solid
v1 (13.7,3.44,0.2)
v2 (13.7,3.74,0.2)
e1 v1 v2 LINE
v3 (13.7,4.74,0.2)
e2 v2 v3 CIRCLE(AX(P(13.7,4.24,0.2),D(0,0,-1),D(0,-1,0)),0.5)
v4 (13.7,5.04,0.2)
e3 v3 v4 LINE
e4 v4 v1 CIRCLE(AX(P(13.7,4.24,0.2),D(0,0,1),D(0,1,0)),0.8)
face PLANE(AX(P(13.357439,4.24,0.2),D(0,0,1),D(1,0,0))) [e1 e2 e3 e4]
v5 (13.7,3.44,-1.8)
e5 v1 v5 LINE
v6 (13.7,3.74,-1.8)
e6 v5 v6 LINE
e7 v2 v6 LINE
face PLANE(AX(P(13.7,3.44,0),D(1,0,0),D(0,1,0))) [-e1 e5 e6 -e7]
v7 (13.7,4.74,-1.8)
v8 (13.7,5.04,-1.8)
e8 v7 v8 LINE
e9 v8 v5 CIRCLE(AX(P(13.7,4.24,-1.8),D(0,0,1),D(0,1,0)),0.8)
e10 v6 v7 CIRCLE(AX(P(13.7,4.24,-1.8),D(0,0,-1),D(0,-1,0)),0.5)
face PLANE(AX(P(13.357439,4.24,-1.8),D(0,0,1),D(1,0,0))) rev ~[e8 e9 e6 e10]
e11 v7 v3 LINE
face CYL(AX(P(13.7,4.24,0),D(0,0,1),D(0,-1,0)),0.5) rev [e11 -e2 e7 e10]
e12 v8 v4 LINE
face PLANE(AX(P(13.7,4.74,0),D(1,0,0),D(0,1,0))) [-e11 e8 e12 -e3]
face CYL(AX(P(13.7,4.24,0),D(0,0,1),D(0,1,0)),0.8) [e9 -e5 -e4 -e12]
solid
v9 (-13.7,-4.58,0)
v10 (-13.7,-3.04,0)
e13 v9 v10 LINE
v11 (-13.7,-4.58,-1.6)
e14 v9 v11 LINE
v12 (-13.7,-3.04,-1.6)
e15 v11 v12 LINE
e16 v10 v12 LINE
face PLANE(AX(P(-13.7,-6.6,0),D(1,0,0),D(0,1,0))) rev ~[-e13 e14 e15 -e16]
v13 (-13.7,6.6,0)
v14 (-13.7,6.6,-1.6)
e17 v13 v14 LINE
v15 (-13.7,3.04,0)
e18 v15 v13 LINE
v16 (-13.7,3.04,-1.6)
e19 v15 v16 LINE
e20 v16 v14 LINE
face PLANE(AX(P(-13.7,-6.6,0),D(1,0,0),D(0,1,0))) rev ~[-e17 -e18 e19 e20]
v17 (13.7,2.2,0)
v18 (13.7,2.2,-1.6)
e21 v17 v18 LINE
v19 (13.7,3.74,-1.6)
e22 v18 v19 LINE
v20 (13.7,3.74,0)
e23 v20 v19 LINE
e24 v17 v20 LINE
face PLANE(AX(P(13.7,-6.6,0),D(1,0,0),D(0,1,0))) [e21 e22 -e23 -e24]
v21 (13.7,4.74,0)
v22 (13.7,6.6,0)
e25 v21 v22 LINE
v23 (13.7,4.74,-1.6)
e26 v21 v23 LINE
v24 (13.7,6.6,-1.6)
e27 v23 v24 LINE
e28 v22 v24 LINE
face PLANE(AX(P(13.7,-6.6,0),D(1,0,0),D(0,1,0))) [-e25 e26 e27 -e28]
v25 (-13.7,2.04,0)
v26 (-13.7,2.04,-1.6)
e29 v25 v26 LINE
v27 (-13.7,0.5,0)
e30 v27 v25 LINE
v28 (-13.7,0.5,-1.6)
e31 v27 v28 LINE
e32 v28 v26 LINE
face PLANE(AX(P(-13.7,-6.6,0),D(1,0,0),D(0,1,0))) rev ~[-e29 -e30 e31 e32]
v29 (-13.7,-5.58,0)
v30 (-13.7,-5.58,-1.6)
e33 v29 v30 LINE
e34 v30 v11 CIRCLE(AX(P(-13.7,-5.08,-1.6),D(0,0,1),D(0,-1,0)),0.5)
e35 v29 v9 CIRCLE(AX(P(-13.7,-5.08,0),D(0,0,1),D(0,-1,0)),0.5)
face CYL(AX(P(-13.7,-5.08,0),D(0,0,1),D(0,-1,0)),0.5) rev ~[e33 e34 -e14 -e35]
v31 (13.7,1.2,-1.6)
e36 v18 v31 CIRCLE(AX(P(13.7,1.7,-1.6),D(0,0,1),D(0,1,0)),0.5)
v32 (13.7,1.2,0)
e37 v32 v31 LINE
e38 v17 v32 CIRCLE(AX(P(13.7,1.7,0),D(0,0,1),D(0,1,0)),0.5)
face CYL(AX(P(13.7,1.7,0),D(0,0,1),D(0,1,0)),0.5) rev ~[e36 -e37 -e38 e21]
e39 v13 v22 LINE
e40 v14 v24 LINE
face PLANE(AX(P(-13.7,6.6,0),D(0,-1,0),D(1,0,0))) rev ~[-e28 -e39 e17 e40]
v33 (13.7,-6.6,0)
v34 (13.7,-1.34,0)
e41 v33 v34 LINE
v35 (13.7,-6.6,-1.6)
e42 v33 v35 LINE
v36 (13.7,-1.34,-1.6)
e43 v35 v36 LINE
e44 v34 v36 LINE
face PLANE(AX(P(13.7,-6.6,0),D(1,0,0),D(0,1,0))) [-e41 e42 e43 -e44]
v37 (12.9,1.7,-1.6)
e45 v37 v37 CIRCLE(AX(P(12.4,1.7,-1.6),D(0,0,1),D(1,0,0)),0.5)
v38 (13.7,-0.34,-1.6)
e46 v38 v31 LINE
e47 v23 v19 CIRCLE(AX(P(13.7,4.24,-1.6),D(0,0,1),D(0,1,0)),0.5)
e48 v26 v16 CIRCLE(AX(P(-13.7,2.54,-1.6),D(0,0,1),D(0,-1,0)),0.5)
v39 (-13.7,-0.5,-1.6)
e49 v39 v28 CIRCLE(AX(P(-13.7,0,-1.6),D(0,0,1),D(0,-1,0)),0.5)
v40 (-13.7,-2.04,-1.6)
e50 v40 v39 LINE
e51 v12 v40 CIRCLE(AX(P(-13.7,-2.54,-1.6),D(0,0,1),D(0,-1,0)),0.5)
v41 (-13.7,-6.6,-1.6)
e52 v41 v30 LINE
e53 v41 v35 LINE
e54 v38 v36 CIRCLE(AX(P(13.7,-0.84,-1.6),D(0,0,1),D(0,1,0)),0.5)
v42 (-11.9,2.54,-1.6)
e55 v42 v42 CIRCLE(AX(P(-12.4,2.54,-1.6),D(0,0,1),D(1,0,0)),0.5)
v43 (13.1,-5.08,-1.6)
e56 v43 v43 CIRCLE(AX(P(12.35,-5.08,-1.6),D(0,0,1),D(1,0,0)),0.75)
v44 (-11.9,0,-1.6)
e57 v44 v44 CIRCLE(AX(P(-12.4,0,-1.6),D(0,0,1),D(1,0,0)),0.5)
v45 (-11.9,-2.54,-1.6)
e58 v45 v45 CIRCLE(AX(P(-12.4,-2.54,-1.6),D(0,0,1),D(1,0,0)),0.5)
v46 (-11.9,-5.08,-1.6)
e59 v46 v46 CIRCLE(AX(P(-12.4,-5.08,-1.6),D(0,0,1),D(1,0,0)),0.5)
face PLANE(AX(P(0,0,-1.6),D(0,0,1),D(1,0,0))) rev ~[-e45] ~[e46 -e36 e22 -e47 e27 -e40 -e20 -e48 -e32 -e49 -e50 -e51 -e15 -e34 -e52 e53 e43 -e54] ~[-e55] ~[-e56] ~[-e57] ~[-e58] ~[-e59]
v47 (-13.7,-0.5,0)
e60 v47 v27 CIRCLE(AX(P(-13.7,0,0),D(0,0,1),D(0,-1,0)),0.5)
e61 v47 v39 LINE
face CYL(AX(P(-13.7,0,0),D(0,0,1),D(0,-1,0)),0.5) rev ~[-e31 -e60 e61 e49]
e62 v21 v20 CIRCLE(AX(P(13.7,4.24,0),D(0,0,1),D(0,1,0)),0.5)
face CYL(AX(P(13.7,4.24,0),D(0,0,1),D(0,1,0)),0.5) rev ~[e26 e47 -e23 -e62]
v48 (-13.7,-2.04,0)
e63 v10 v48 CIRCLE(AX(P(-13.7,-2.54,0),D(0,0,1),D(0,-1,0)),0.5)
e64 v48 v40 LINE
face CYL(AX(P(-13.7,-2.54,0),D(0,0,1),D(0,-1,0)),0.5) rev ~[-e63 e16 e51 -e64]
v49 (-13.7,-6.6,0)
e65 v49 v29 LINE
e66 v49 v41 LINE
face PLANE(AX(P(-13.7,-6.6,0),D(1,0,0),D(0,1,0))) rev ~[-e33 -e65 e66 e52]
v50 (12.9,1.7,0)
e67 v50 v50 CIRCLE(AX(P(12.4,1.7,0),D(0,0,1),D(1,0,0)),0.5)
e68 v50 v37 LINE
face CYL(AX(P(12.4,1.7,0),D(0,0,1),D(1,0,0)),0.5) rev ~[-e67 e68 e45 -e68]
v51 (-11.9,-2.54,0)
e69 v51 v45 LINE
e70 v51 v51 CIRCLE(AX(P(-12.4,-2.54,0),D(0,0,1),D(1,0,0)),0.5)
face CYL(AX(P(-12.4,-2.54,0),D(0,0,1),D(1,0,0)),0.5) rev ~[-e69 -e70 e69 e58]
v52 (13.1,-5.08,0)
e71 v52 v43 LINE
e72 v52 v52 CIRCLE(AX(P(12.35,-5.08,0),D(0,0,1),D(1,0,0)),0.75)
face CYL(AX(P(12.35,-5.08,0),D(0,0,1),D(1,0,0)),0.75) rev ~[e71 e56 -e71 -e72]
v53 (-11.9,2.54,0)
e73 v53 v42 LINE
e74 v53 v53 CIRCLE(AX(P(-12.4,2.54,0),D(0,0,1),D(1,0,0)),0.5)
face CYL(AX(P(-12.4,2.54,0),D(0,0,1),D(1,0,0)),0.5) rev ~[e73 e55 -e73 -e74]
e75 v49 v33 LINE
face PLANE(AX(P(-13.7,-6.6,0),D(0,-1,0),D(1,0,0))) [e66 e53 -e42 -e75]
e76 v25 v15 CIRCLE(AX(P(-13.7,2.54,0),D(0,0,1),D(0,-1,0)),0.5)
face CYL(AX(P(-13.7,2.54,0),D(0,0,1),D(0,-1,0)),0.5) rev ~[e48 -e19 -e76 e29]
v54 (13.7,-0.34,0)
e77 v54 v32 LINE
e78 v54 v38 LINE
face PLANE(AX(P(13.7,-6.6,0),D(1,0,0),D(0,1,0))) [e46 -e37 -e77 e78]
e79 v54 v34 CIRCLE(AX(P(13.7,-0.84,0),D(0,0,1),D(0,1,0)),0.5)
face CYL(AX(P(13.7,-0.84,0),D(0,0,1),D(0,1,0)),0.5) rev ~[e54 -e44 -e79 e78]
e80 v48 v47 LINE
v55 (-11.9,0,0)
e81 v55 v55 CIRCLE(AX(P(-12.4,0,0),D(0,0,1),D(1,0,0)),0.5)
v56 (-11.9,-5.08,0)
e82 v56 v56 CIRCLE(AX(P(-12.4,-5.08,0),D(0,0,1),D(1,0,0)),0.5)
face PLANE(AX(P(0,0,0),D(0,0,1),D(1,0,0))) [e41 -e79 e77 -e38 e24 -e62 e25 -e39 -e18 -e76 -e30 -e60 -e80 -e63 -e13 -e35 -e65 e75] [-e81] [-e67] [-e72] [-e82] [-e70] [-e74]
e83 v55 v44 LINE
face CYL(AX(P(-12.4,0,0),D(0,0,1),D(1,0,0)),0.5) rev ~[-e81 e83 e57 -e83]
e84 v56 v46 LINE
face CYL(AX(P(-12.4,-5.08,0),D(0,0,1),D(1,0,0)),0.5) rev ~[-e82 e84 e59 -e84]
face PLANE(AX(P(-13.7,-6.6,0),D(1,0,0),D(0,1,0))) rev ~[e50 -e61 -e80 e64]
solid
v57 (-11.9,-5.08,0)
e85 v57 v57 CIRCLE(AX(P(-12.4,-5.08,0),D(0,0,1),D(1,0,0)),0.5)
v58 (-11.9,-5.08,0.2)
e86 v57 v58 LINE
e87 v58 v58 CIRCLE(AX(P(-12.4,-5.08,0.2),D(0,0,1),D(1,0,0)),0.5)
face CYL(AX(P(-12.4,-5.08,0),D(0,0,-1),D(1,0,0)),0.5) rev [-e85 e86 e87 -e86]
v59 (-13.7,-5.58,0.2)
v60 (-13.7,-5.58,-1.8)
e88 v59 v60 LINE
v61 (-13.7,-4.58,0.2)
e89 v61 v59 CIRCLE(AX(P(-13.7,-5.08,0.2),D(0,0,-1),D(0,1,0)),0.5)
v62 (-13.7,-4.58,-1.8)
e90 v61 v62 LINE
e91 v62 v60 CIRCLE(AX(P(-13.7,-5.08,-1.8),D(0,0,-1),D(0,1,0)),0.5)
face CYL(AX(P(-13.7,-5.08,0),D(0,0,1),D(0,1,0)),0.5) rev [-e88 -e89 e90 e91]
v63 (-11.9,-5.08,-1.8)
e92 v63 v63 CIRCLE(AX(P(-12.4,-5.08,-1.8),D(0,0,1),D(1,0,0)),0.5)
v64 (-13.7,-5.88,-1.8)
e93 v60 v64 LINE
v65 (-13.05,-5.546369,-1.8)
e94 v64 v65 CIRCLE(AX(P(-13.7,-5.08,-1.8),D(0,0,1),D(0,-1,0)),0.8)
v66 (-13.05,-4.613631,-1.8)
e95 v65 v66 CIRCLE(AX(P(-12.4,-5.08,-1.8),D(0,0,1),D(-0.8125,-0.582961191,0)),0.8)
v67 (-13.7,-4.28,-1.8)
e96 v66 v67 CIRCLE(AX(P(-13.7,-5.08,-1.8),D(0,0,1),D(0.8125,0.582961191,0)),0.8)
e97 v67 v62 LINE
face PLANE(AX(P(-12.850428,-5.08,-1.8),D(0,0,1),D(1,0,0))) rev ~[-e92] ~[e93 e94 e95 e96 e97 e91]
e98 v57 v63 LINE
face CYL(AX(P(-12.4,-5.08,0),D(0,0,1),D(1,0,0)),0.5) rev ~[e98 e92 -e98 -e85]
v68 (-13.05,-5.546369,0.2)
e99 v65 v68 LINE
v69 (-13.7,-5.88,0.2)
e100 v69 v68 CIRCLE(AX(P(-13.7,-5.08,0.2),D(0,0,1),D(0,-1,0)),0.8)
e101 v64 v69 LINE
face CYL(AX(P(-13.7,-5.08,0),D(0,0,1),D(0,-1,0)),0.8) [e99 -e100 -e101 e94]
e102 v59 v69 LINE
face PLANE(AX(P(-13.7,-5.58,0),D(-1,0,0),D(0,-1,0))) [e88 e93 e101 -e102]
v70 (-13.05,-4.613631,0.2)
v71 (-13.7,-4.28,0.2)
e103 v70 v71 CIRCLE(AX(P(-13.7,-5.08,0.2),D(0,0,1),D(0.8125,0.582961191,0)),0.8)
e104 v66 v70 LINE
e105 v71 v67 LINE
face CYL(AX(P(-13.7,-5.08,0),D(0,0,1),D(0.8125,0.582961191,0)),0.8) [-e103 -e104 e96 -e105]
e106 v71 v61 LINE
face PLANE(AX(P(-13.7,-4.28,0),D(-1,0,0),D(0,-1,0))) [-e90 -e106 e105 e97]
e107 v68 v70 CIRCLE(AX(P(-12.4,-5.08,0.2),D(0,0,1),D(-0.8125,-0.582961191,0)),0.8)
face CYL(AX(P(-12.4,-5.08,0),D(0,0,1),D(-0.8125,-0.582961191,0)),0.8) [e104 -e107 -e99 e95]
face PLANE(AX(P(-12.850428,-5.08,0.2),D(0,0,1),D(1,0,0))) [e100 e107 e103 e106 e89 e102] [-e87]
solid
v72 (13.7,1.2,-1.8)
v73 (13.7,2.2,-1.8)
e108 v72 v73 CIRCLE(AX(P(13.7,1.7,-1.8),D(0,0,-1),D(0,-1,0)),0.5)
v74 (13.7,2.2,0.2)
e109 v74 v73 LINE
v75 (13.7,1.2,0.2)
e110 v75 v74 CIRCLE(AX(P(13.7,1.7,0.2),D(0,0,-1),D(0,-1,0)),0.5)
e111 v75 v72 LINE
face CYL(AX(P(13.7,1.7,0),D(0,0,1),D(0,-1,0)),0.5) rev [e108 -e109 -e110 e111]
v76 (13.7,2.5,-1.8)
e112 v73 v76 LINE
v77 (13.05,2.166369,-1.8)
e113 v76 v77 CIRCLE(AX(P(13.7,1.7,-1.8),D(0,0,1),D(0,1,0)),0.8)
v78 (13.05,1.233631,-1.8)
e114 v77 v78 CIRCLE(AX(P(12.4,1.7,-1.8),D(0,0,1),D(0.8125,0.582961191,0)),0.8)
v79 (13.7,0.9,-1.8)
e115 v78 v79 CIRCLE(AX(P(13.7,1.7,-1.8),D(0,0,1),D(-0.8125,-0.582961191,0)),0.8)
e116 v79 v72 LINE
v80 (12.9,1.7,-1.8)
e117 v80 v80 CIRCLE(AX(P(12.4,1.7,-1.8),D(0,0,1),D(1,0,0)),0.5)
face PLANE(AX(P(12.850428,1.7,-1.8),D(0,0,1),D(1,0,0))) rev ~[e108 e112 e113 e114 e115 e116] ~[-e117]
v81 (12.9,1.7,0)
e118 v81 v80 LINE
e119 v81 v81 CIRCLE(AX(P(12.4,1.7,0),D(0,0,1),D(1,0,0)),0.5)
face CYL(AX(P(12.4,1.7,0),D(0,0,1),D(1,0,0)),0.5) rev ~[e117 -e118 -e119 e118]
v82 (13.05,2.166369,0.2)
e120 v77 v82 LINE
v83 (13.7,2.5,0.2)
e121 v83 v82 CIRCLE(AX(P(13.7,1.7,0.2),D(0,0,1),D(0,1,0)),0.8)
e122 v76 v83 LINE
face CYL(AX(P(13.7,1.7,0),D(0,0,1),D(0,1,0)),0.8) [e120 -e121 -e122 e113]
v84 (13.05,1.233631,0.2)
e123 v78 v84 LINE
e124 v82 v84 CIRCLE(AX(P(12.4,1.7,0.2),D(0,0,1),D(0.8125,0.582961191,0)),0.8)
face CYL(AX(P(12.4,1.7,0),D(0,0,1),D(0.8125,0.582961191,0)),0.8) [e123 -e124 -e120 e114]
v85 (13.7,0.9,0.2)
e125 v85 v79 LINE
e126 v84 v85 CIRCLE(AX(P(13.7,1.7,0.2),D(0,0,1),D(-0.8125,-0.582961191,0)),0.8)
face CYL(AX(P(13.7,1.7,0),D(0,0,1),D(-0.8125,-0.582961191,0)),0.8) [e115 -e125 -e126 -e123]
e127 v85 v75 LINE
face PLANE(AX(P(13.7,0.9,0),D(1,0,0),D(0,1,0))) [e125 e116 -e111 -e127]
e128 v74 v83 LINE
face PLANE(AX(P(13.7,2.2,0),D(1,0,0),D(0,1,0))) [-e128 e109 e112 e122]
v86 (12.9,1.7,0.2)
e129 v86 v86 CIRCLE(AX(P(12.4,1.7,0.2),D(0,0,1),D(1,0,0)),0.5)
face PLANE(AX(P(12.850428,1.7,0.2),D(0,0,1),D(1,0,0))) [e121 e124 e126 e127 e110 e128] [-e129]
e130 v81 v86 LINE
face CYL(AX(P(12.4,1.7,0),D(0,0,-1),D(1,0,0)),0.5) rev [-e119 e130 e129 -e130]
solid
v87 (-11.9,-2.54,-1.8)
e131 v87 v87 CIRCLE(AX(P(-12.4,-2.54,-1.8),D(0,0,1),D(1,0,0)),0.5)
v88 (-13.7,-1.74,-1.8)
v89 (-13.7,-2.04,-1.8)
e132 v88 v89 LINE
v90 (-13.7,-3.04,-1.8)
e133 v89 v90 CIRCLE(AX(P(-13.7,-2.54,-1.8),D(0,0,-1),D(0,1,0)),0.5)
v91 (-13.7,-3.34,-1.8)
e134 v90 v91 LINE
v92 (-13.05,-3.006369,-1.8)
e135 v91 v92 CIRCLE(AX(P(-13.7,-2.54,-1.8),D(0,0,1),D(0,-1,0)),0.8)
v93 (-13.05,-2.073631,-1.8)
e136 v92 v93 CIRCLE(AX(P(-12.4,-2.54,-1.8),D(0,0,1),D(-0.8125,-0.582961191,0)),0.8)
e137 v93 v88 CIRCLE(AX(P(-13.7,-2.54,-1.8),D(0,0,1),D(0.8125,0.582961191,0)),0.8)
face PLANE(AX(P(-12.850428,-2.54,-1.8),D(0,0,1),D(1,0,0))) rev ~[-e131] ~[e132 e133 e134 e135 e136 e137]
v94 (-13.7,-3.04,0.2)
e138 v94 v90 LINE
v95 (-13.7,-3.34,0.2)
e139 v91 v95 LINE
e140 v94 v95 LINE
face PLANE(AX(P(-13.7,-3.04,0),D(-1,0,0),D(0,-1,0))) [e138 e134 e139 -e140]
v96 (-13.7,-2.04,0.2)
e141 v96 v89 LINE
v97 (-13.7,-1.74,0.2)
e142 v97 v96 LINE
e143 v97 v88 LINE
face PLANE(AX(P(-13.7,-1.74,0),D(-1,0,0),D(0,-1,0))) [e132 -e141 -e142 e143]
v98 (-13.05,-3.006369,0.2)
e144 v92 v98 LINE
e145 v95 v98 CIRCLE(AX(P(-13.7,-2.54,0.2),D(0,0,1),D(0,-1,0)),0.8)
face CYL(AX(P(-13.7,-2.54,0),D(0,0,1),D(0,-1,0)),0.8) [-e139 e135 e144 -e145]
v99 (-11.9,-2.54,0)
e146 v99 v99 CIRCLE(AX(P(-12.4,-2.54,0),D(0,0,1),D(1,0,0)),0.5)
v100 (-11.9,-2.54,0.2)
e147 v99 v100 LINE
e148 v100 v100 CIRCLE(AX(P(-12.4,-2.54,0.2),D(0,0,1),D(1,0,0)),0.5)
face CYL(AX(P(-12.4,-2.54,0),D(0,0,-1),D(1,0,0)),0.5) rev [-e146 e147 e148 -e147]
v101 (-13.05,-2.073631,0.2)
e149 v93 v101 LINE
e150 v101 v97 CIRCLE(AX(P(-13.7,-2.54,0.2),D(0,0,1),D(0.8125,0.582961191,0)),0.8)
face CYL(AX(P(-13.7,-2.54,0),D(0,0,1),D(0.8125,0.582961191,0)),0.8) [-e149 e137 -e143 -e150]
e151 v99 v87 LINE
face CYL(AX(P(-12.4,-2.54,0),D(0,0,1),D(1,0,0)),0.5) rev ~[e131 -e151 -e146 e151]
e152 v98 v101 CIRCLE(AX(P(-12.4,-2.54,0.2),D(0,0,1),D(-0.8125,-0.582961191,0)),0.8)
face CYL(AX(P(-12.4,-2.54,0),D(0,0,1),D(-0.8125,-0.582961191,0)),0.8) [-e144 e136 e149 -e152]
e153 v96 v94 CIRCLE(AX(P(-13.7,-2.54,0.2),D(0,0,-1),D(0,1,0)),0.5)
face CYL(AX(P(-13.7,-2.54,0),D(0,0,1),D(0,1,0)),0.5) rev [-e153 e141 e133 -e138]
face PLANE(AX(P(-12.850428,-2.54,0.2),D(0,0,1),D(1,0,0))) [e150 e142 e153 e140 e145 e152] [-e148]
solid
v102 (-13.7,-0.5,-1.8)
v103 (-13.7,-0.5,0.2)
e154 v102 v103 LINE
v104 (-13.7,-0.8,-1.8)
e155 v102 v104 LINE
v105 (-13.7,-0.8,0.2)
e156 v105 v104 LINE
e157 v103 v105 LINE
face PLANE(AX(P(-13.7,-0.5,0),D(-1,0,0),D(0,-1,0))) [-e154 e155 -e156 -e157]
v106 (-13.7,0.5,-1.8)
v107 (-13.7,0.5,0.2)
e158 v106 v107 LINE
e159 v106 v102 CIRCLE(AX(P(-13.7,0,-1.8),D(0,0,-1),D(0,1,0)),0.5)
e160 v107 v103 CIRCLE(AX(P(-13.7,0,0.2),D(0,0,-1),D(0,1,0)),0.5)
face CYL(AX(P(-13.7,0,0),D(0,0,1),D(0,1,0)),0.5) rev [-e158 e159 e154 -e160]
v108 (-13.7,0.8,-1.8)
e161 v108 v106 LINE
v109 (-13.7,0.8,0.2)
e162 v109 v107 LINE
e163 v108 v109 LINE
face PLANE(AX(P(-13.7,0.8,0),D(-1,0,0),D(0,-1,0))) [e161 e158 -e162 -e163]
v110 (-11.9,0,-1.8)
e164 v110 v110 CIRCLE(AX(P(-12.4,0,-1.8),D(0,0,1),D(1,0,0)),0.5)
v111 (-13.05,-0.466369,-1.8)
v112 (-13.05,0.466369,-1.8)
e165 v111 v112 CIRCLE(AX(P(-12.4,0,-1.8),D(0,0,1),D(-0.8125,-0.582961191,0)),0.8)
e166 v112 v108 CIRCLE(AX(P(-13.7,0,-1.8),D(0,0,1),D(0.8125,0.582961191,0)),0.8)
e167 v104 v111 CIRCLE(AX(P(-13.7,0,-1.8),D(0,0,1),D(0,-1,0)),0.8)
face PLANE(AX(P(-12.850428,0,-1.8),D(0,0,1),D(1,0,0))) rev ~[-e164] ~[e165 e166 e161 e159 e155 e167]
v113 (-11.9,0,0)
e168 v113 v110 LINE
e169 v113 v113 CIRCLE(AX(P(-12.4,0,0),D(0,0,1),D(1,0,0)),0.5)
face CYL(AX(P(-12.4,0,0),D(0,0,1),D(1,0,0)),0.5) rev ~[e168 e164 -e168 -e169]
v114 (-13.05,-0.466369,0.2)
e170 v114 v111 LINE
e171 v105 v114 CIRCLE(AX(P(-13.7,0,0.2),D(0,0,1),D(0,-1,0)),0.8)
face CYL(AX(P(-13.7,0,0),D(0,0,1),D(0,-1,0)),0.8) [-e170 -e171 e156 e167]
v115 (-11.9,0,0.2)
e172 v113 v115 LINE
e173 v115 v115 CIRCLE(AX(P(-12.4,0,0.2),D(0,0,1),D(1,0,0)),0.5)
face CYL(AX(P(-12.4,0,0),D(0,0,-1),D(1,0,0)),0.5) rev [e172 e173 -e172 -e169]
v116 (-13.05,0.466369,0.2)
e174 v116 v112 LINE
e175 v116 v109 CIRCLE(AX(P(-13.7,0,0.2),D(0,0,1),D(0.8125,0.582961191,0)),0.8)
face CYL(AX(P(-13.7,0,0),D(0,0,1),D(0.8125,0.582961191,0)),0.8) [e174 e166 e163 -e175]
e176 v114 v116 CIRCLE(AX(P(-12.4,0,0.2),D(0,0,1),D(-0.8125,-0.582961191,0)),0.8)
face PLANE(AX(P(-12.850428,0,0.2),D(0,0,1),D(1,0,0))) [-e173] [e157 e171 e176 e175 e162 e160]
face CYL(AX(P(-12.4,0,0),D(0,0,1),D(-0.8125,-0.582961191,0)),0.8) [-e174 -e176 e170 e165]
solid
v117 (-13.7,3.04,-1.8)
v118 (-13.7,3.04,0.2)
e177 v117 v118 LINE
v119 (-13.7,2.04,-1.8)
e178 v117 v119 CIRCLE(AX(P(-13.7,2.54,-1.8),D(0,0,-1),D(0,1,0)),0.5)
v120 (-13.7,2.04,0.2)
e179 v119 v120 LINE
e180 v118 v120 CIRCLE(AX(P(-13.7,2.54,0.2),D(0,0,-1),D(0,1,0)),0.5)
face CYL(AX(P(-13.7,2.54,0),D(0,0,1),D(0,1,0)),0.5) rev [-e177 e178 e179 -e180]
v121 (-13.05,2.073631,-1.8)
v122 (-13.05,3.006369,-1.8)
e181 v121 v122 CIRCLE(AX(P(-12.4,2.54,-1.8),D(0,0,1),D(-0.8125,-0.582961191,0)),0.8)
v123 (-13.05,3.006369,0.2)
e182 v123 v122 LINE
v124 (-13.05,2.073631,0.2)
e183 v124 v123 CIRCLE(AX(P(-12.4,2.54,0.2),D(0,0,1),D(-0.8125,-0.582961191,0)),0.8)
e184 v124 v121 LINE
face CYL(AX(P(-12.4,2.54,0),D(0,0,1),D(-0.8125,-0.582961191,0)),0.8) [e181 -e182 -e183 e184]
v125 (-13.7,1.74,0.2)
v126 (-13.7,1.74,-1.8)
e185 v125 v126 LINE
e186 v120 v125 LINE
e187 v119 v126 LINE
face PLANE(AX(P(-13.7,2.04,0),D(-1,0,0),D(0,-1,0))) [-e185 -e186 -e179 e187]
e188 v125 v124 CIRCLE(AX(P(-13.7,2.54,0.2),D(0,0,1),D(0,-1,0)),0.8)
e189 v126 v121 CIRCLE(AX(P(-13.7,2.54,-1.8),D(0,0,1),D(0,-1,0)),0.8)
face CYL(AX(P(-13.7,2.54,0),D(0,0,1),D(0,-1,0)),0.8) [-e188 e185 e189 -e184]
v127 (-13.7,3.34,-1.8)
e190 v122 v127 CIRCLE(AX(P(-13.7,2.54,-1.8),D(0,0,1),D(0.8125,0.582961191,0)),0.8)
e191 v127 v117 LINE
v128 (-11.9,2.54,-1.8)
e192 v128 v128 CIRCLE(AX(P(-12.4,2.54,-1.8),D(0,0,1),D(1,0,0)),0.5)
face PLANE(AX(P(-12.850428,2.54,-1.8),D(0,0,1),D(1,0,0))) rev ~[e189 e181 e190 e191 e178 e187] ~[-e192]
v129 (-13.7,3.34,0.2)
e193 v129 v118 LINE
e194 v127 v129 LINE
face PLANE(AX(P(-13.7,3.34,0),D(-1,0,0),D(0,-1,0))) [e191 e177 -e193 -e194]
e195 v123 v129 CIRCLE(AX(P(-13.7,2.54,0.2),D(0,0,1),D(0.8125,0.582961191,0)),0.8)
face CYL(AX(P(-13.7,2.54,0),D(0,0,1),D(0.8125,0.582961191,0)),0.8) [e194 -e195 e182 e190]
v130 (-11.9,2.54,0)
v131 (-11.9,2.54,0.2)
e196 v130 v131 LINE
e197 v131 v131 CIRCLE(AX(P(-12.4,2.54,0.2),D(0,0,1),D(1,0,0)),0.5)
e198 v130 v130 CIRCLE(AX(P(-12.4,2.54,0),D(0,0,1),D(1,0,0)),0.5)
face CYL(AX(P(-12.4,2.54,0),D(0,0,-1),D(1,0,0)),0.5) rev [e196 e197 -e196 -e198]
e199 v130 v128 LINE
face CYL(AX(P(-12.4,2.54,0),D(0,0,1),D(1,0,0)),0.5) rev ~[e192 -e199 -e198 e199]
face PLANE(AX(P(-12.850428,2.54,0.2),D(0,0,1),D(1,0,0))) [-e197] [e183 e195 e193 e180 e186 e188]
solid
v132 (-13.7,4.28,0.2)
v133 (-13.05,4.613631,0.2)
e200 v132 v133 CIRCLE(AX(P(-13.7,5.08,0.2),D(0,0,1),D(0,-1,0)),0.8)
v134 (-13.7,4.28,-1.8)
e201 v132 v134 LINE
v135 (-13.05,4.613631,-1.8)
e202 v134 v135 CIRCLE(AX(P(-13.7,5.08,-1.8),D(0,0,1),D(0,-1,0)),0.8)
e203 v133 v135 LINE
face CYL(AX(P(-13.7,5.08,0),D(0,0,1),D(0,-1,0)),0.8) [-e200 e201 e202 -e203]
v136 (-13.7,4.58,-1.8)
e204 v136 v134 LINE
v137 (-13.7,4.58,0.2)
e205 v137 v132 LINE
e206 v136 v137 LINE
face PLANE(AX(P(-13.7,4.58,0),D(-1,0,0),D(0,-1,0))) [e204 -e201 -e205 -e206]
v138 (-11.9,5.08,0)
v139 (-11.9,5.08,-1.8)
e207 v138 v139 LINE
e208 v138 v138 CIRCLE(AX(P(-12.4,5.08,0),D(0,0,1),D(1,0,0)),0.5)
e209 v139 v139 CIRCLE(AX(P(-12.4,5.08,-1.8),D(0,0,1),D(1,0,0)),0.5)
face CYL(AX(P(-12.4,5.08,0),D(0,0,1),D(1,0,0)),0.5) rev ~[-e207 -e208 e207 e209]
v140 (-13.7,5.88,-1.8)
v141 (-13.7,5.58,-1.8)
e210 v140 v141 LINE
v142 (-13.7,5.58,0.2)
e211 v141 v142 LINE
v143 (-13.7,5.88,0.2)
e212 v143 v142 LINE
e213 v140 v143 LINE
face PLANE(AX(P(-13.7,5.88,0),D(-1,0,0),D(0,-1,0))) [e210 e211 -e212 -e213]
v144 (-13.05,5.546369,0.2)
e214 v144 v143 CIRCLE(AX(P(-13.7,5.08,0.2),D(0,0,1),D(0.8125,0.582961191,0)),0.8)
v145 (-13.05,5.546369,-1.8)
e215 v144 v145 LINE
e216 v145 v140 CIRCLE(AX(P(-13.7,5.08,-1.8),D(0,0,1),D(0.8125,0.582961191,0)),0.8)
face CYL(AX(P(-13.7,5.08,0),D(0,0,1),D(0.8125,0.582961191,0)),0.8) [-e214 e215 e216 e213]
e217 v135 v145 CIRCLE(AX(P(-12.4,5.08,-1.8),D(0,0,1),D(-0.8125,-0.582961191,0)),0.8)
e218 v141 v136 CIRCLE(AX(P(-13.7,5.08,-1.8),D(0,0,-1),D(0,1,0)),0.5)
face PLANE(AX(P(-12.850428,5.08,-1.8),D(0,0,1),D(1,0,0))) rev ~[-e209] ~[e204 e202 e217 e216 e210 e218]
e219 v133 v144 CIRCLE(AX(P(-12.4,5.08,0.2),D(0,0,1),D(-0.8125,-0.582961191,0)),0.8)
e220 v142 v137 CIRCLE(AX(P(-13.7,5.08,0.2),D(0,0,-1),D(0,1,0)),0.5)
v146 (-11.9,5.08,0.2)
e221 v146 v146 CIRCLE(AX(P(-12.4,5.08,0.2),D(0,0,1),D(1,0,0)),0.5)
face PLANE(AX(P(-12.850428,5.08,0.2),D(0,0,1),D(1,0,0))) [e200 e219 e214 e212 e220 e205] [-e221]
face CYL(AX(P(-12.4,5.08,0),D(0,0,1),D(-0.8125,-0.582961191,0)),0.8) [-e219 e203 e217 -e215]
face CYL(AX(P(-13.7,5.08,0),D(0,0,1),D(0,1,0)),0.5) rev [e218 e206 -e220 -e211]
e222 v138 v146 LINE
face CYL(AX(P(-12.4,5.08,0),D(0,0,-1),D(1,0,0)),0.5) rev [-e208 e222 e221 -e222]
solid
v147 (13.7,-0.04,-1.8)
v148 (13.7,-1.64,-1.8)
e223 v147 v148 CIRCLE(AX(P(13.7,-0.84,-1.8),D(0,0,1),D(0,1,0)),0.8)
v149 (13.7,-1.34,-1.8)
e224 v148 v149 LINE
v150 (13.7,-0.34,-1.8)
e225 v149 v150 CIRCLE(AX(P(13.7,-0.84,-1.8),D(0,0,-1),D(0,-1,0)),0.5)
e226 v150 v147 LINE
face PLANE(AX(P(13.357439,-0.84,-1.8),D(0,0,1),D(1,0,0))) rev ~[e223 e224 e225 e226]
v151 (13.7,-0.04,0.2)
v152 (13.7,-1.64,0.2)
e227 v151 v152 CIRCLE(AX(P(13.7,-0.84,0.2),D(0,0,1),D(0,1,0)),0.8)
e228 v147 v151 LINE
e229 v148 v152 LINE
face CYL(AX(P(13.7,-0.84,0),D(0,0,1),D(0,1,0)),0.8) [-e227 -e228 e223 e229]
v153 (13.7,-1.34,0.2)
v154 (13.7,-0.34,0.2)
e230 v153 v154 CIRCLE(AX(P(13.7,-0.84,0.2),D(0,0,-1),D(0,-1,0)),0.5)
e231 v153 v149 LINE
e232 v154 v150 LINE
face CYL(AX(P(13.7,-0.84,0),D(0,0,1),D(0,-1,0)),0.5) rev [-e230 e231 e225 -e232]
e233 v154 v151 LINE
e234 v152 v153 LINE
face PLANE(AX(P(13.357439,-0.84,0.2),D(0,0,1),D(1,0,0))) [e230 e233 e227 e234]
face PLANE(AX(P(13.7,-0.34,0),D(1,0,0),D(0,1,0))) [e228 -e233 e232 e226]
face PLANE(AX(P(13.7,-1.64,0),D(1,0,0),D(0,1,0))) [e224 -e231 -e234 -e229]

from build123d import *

# Parameters (mm, degrees)
F0_W          = 27.4
F0_H          = 13.2
F0_R          = 0.75
F1_DEPTH      = 1.6
F2_DEPTH      = 1.601
F4_DEPTH      = 0.2
F4_DEPTH_BACK = 1.8
F3_R          = 0.5
F5_DEPTH      = 1.801


# Not quite as in the source:
# - a feature names something its author has since deleted; it is built from what else it names


with BuildPart() as f1:
    # F0 (on Top) → F1 (new body)
    with BuildSketch(Plane.XY):
        Rectangle(F0_W, F0_H)
        with Locations((12.35, -5.08)):
            Circle(F0_R, mode=Mode.SUBTRACT)
        with Locations((12.35, -5.08)):
            Circle(F0_R)
    extrude(amount=-F1_DEPTH)

    # F0 (on Top) → F2 (cut, through all)
    with BuildSketch(Plane.XY):
        with Locations((12.35, -5.08)):
            Circle(F0_R)
    extrude(amount=-F2_DEPTH, mode=Mode.SUBTRACT)

    # F3 (on face) → F5 (cut, through all)
    with BuildSketch(Plane.XY):
        with Locations((-12.4, 2.54)):
            Circle(F3_R)
        with BuildLine():
            ThreePointArc((-13.7, 2.04), (-13.2, 2.54), (-13.7, 3.04))
            Line((-13.7, 3.04), (-13.7, 2.04))
        make_face()
        with Locations((-12.4, 0)):
            Circle(F3_R)
        with BuildLine():
            ThreePointArc((-13.7, -0.5), (-13.2, 0), (-13.7, 0.5))
            Line((-13.7, 0.5), (-13.7, -0.5))
        make_face()
        with Locations((-12.4, -2.54)):
            Circle(F3_R)
        with BuildLine():
            Line((-13.7, -2.04), (-13.7, -3.04))
            ThreePointArc((-13.7, -3.04), (-13.2, -2.54), (-13.7, -2.04))
        make_face()
        with Locations((-12.4, -5.08)):
            Circle(F3_R)
        with BuildLine():
            Line((-13.7, -4.58), (-13.7, -5.58))
            ThreePointArc((-13.7, -5.58), (-13.2, -5.08), (-13.7, -4.58))
        make_face()
        with BuildLine():
            Line((13.7, -1.34), (13.7, -0.34))
            ThreePointArc((13.7, -0.34), (13.2, -0.84), (13.7, -1.34))
        make_face()
        with BuildLine():
            Line((13.7, 3.74), (13.7, 4.74))
            ThreePointArc((13.7, 4.74), (13.2, 4.24), (13.7, 3.74))
        make_face()
        with BuildLine():
            Line((13.7, 1.2), (13.7, 2.2))
            ThreePointArc((13.7, 2.2), (13.2, 1.7), (13.7, 1.2))
        make_face()
        with Locations((12.4, 1.7)):
            Circle(F3_R)
    extrude(amount=-F5_DEPTH, mode=Mode.SUBTRACT)


with BuildPart() as f4:
    # F3 (on face) → F4 (new body, two sides)
    with BuildSketch(Plane.XY) as f4_sk:
        with BuildLine():
            Line((13.7, -0.34), (13.7, -0.04))
            ThreePointArc((13.7, -0.04), (12.9, -0.84), (13.7, -1.64))
            Line((13.7, -1.64), (13.7, -1.34))
            ThreePointArc((13.7, -1.34), (13.2, -0.84), (13.7, -0.34))
        make_face()
    extrude(amount=F4_DEPTH)
    extrude(f4_sk.sketch, amount=-F4_DEPTH_BACK)


with BuildPart() as f4b:
    # F3 (on face) → F4, piece 2 (new body, two sides)
    with BuildSketch(Plane.XY) as f4_2_sk:
        with BuildLine():
            Line((-13.7, -5.58), (-13.7, -5.88))
            ThreePointArc((-13.7, -5.88), (-13.3346886, -5.7917215615), (-13.05, -5.5463689527))
            ThreePointArc((-13.05, -5.5463689527), (-11.6, -5.08), (-13.05, -4.6136310473))
            ThreePointArc((-13.05, -4.6136310473), (-13.3346886, -4.3682784385), (-13.7, -4.28))
            Line((-13.7, -4.28), (-13.7, -4.58))
            ThreePointArc((-13.7, -4.58), (-13.2, -5.08), (-13.7, -5.58))
        make_face()
        with Locations((-12.4, -5.08)):
            Circle(F3_R, mode=Mode.SUBTRACT)
    extrude(amount=F4_DEPTH)
    extrude(f4_2_sk.sketch, amount=-F4_DEPTH_BACK)


with BuildPart() as f4c:
    # F3 (on face) → F4, piece 3 (new body, two sides)
    with BuildSketch(Plane.XY) as f4_3_sk:
        with BuildLine():
            ThreePointArc((-13.05, 5.5463689527), (-13.3346886, 5.7917215615), (-13.7, 5.88))
            Line((-13.7, 5.88), (-13.7, 5.58))
            ThreePointArc((-13.7, 5.58), (-13.2, 5.08), (-13.7, 4.58))
            Line((-13.7, 4.58), (-13.7, 4.28))
            ThreePointArc((-13.7, 4.28), (-13.3346886, 4.3682784385), (-13.05, 4.6136310473))
            ThreePointArc((-13.05, 4.6136310473), (-11.6, 5.08), (-13.05, 5.5463689527))
        make_face()
        with Locations((-12.4, 5.08)):
            Circle(F3_R, mode=Mode.SUBTRACT)
    extrude(amount=F4_DEPTH)
    extrude(f4_3_sk.sketch, amount=-F4_DEPTH_BACK)


with BuildPart() as f4d:
    # F3 (on face) → F4, piece 4 (new body, two sides)
    with BuildSketch(Plane.XY) as f4_4_sk:
        with BuildLine():
            ThreePointArc((-13.05, 3.0063689527), (-13.3346886, 3.2517215615), (-13.7, 3.34))
            Line((-13.7, 3.34), (-13.7, 3.04))
            ThreePointArc((-13.7, 3.04), (-13.2, 2.54), (-13.7, 2.04))
            Line((-13.7, 2.04), (-13.7, 1.74))
            ThreePointArc((-13.7, 1.74), (-13.3346886, 1.8282784385), (-13.05, 2.0736310473))
            ThreePointArc((-13.05, 2.0736310473), (-11.6, 2.54), (-13.05, 3.0063689527))
        make_face()
        with Locations((-12.4, 2.54)):
            Circle(F3_R, mode=Mode.SUBTRACT)
    extrude(amount=F4_DEPTH)
    extrude(f4_4_sk.sketch, amount=-F4_DEPTH_BACK)


with BuildPart() as f4e:
    # F3 (on face) → F4, piece 5 (new body, two sides)
    with BuildSketch(Plane.XY) as f4_5_sk:
        with BuildLine():
            ThreePointArc((-13.05, 0.4663689527), (-13.3346886, 0.7117215615), (-13.7, 0.8))
            Line((-13.7, 0.8), (-13.7, 0.5))
            ThreePointArc((-13.7, 0.5), (-13.2, 0), (-13.7, -0.5))
            Line((-13.7, -0.5), (-13.7, -0.8))
            ThreePointArc((-13.7, -0.8), (-13.3346886, -0.7117215615), (-13.05, -0.4663689527))
            ThreePointArc((-13.05, -0.4663689527), (-11.6, 0), (-13.05, 0.4663689527))
        make_face()
        with Locations((-12.4, 0)):
            Circle(F3_R, mode=Mode.SUBTRACT)
    extrude(amount=F4_DEPTH)
    extrude(f4_5_sk.sketch, amount=-F4_DEPTH_BACK)


with BuildPart() as f4f:
    # F3 (on face) → F4, piece 6 (new body, two sides)
    with BuildSketch(Plane.XY) as f4_6_sk:
        with BuildLine():
            Line((-13.7, -3.04), (-13.7, -3.34))
            ThreePointArc((-13.7, -3.34), (-13.3346886, -3.2517215615), (-13.05, -3.0063689527))
            ThreePointArc((-13.05, -3.0063689527), (-11.6, -2.54), (-13.05, -2.0736310473))
            ThreePointArc((-13.05, -2.0736310473), (-13.3346886, -1.8282784385), (-13.7, -1.74))
            Line((-13.7, -1.74), (-13.7, -2.04))
            ThreePointArc((-13.7, -2.04), (-13.2, -2.54), (-13.7, -3.04))
        make_face()
        with Locations((-12.4, -2.54)):
            Circle(F3_R, mode=Mode.SUBTRACT)
    extrude(amount=F4_DEPTH)
    extrude(f4_6_sk.sketch, amount=-F4_DEPTH_BACK)


with BuildPart() as f4g:
    # F3 (on face) → F4, piece 7 (new body, two sides)
    with BuildSketch(Plane.XY) as f4_7_sk:
        with BuildLine():
            ThreePointArc((13.7, 3.74), (13.2, 4.24), (13.7, 4.74))
            Line((13.7, 4.74), (13.7, 5.04))
            ThreePointArc((13.7, 5.04), (12.9, 4.24), (13.7, 3.44))
            Line((13.7, 3.44), (13.7, 3.74))
        make_face()
    extrude(amount=F4_DEPTH)
    extrude(f4_7_sk.sketch, amount=-F4_DEPTH_BACK)


with BuildPart() as f4h:
    # F3 (on face) → F4, piece 8 (new body, two sides)
    with BuildSketch(Plane.XY) as f4_8_sk:
        with BuildLine():
            Line((13.7, 2.2), (13.7, 2.5))
            ThreePointArc((13.7, 2.5), (13.3346886, 2.4117215615), (13.05, 2.1663689527))
            ThreePointArc((13.05, 2.1663689527), (11.6, 1.7), (13.05, 1.2336310473))
            ThreePointArc((13.05, 1.2336310473), (13.3346886, 0.9882784385), (13.7, 0.9))
            Line((13.7, 0.9), (13.7, 1.2))
            ThreePointArc((13.7, 1.2), (13.2, 1.7), (13.7, 2.2))
        make_face()
        with Locations((12.4, 1.7)):
            Circle(F3_R, mode=Mode.SUBTRACT)
    extrude(amount=F4_DEPTH)
    extrude(f4_8_sk.sketch, amount=-F4_DEPTH_BACK)


solid = Compound([f1.part, f4.part, f4b.part, f4c.part, f4d.part, f4e.part, f4f.part, f4g.part, f4h.part])
